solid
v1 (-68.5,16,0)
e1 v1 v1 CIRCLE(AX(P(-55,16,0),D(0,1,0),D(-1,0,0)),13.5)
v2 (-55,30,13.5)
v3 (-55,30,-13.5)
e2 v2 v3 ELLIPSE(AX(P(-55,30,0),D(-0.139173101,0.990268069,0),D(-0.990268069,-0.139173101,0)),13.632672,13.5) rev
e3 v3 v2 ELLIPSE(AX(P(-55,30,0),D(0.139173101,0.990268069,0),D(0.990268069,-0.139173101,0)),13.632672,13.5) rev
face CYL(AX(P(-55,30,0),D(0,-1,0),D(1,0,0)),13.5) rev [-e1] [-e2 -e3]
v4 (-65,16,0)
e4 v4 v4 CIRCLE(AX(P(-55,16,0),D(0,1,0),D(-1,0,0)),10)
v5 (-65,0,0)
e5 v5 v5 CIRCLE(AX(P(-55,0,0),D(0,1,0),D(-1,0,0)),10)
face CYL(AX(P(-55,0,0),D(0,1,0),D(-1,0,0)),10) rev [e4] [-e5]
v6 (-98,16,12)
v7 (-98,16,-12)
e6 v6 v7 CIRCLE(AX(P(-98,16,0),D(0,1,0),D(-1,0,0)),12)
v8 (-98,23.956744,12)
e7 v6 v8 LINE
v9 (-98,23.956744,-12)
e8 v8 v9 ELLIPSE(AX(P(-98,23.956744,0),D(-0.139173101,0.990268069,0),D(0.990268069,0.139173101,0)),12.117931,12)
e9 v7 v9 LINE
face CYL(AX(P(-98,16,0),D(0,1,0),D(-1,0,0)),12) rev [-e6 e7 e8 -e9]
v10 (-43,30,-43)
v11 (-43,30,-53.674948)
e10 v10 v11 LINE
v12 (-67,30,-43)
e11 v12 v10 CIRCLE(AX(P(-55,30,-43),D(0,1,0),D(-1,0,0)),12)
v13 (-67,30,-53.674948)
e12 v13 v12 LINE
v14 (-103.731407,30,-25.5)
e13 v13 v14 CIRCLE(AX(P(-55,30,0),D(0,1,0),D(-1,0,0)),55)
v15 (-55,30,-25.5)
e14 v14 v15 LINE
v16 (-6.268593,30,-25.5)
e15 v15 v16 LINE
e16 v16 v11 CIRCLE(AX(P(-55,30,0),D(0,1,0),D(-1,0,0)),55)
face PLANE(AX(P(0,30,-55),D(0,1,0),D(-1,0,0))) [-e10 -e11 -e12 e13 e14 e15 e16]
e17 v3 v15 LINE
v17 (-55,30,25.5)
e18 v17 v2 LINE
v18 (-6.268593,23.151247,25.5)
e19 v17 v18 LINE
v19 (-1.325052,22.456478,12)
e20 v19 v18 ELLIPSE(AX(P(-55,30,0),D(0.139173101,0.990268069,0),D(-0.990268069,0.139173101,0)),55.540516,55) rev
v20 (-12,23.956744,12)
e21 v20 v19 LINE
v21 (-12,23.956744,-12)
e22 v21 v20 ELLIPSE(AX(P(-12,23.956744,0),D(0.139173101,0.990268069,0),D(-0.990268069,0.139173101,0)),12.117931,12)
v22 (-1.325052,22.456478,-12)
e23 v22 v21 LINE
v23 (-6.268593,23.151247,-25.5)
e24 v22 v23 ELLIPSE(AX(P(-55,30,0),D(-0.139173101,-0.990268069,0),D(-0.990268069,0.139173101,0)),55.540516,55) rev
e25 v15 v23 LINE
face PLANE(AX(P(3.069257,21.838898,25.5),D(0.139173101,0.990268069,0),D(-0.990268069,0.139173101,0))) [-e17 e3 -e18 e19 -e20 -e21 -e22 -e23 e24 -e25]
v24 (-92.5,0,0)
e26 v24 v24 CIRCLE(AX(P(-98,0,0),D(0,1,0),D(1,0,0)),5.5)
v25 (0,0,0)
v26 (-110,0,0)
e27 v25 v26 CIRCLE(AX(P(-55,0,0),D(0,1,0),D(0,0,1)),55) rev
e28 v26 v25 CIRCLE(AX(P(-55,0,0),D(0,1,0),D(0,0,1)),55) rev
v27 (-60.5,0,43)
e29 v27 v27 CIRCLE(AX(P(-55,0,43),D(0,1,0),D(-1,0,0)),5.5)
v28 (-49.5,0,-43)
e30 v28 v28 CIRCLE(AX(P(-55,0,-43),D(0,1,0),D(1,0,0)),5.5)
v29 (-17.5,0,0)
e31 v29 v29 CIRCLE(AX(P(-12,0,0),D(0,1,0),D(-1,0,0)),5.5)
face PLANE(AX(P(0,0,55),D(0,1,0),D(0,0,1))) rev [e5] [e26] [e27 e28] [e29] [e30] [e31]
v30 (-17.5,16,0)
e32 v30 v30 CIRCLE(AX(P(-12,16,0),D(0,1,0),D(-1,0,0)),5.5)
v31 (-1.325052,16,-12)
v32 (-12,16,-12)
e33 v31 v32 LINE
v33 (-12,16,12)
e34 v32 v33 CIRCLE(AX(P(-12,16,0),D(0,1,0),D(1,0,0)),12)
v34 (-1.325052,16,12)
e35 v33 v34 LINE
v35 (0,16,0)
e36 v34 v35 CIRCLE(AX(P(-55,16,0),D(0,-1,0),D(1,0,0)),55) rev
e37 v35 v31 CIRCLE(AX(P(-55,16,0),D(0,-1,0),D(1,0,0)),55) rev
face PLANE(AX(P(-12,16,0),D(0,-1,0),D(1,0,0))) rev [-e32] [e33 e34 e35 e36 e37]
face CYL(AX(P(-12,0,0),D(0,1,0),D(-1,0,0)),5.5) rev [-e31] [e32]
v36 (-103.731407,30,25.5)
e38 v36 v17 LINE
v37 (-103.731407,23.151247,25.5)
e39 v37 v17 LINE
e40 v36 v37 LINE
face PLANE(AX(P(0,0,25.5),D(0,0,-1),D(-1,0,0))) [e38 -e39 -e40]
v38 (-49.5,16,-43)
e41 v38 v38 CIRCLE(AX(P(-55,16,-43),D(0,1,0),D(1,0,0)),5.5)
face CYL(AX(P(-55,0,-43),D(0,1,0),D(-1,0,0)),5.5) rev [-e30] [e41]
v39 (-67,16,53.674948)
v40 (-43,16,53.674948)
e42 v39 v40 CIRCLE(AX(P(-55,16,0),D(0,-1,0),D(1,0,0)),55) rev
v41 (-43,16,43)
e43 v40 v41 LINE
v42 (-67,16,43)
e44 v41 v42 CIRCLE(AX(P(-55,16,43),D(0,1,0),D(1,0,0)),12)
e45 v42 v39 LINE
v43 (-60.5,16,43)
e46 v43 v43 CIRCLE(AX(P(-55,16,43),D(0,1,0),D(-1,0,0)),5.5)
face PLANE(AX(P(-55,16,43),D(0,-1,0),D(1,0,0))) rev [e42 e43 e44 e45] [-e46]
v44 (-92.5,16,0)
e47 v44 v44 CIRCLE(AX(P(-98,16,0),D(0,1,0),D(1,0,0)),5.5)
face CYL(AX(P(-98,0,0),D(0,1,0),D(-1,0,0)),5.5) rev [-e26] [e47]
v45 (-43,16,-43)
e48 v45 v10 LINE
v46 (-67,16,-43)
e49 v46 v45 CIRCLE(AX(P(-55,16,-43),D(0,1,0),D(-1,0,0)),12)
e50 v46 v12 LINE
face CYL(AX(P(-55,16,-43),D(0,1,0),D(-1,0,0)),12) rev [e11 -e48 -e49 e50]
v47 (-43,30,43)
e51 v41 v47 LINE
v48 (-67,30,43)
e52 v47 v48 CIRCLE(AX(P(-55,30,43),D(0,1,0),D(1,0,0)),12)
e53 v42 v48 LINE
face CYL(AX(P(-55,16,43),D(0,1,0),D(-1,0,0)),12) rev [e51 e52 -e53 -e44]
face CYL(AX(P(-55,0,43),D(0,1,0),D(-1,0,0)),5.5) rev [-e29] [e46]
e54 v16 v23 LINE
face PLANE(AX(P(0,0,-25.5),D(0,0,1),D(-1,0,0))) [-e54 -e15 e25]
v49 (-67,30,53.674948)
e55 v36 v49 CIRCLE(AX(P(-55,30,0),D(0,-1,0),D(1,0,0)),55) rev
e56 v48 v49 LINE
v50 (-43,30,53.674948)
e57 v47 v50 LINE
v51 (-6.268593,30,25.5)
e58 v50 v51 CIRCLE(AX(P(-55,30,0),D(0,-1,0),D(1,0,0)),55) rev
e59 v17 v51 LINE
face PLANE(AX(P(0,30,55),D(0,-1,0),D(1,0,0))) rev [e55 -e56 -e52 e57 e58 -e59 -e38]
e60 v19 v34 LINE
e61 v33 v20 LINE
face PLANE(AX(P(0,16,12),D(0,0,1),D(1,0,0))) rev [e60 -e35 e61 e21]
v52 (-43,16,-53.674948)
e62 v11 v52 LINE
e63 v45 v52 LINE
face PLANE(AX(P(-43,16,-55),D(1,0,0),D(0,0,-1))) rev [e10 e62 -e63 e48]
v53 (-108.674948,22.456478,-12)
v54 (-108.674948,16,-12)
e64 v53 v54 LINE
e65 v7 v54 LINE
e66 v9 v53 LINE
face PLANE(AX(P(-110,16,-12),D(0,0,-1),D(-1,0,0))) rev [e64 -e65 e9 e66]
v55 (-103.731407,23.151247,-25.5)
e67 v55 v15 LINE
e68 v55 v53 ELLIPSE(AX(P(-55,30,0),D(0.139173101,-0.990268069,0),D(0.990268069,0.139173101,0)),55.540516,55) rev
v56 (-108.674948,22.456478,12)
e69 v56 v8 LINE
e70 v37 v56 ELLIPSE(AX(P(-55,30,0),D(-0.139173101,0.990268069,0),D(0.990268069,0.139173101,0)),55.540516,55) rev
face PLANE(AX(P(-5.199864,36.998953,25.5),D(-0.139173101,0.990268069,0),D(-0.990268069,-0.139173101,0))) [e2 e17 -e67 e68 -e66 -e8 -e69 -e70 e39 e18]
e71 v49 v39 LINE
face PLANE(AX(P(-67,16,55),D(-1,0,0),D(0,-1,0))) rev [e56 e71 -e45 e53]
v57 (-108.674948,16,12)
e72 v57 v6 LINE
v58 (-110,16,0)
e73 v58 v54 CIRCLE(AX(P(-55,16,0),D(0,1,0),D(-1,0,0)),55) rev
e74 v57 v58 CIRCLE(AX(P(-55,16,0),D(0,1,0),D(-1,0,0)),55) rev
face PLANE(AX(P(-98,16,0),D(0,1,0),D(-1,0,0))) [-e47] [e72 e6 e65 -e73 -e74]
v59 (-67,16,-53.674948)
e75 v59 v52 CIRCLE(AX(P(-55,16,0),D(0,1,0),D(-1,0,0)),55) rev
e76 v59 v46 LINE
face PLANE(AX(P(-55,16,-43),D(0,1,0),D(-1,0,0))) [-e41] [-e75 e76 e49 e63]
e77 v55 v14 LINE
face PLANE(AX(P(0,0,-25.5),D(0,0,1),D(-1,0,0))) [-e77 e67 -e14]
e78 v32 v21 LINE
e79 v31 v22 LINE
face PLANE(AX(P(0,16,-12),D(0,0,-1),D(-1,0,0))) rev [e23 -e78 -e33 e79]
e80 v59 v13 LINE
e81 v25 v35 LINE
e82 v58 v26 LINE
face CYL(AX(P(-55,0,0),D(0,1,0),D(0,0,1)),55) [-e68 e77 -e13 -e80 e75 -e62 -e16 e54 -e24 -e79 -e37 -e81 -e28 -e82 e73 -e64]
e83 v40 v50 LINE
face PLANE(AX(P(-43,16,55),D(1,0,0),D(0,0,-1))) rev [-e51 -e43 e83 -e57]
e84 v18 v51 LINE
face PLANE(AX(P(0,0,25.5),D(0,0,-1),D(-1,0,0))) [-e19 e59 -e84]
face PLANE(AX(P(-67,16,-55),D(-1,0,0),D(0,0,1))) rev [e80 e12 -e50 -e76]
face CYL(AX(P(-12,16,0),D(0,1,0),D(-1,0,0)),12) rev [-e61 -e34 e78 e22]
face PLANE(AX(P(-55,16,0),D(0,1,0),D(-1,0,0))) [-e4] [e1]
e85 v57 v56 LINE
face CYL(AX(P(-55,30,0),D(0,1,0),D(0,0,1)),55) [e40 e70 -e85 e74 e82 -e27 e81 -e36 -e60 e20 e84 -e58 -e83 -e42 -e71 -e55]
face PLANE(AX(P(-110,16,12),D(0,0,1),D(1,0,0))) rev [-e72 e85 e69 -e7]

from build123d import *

# Parameters (mm, degrees)
SCHIZZO3_W                   = 110
SCHIZZO3_H                   = 30
ESTRUSIONE_ESTRUSIONE2_DEPTH = 55
RACCORDO1_R                  = 55
TAGLIO_ESTRUSIONE1_DEPTH     = 25.5
RACCORDO1_OF_SPECCHIA1_R     = 55
TAGLIO_ESTRUSIONE2_DEPTH     = 14
SCHIZZO9_R                   = 5.5
TAGLIO_ESTRUSIONE3_DEPTH     = 125.020159652
SCHIZZO10_R                  = 13.5
TAGLIO_ESTRUSIONE5_DEPTH     = 125.020159652
SCHIZZO11_R                  = 10
TAGLIO_ESTRUSIONE6_DEPTH     = 125.020159652


with BuildPart() as part:
    # Schizzo3 → Estrusione-Estrusione2 (new body)
    with BuildSketch(Plane.XY):
        with Locations((-55, 15)):
            Rectangle(SCHIZZO3_W, SCHIZZO3_H)
    estrusione_estrusione2 = extrude(amount=ESTRUSIONE_ESTRUSIONE2_DEPTH)

    # Raccordo1
    raccordo1_edges = [part.edges().sort_by_distance(p)[0] for p in [
        (-110, 15, 55),
        (0, 15, 55),
    ]]
    fillet(raccordo1_edges, radius=RACCORDO1_R - 0.0001)  # a hair under: the kernel refuses the full size

    # Schizzo6 → Taglio-Estrusione1 (cut)
    with BuildSketch(Plane(origin=(0, 0, 0), x_dir=(-1, 0, 0), z_dir=(0, 0, -1))):
        Polygon((0, 22.270254091), (55, 30), (0, 30), align=None)
        Polygon((110, 30), (55, 30), (110, 22.270254091), align=None)
    taglio_estrusione1 = extrude(amount=-TAGLIO_ESTRUSIONE1_DEPTH, mode=Mode.SUBTRACT)

    # Specchia1: Estrusione-Estrusione2, Taglio-Estrusione1 across plane
    add(estrusione_estrusione2.mirror(Plane.XY))
    add(taglio_estrusione1.mirror(Plane.XY), mode=Mode.SUBTRACT)

    # Raccordo1 of Specchia1
    raccordo1_of_specchia1_edges = [part.edges().sort_by_distance(p)[0] for p in [
        (-110, 15, -55),
        (0, 15, -55),
    ]]
    fillet(raccordo1_of_specchia1_edges, radius=RACCORDO1_OF_SPECCHIA1_R - 0.0001)  # a hair under: the kernel refuses the full size

    # Schizzo8 → Taglio-Estrusione2 (cut)
    with BuildSketch(Plane(origin=(0, 30, 0), x_dir=(1, 0, 0), z_dir=(0, 1, 0))):
        with BuildLine():
            Line((-43, -55), (-67, -55))
            Line((-67, -55), (-67, -43))
            ThreePointArc((-67, -43), (-55, -31), (-43, -43))
            Line((-43, -43), (-43, -55))
        make_face()
        with BuildLine():
            Line((-67, 55), (-67, 43))
            ThreePointArc((-67, 43), (-55, 31), (-43, 43))
            Line((-43, 43), (-43, 55))
            Line((-43, 55), (-67, 55))
        make_face()
        with BuildLine():
            Line((0, 12), (0, -12))
            Line((0, -12), (-12, -12))
            ThreePointArc((-12, -12), (-24, 0), (-12, 12))
            Line((-12, 12), (0, 12))
        make_face()
        with BuildLine():
            Line((-110, -12), (-98, -12))
            ThreePointArc((-98, -12), (-86, 0), (-98, 12))
            Line((-98, 12), (-110, 12))
            Line((-110, 12), (-110, -12))
        make_face()
    extrude(amount=-TAGLIO_ESTRUSIONE2_DEPTH, mode=Mode.SUBTRACT)

    # Schizzo9 → Taglio-Estrusione3 (cut, through all)
    with BuildSketch(Plane(origin=(0, 16, 0), x_dir=(1, 0, 0), z_dir=(0, 1, 0))):
        with Locations(Location((-12, 0, 0), (0, 0, 180))):
            Circle(SCHIZZO9_R)
        with Locations((-98, 0)):
            Circle(SCHIZZO9_R)
        with Locations(Location((-55, -43, 0), (0, 0, 180))):
            Circle(SCHIZZO9_R)
        with Locations((-55, 43)):
            Circle(SCHIZZO9_R)
    extrude(amount=-TAGLIO_ESTRUSIONE3_DEPTH, mode=Mode.SUBTRACT)

    # Schizzo10 → Taglio-Estrusione5 (cut, through all)
    with BuildSketch(Plane(origin=(0, 16, 0), x_dir=(1, 0, 0), z_dir=(0, 1, 0))):
        with Locations(Location((-55, 0, 0), (0, 0, 270))):
            Circle(SCHIZZO10_R)
    extrude(amount=TAGLIO_ESTRUSIONE5_DEPTH, mode=Mode.SUBTRACT)

    # Schizzo11 → Taglio-Estrusione6 (cut, through all)
    with BuildSketch(Plane(origin=(0, 16, 0), x_dir=(1, 0, 0), z_dir=(0, 1, 0))):
        with Locations(Location((-55, 0, 0), (0, 0, 180))):
            Circle(SCHIZZO11_R)
    extrude(amount=-TAGLIO_ESTRUSIONE6_DEPTH, mode=Mode.SUBTRACT)


solid = part.part
